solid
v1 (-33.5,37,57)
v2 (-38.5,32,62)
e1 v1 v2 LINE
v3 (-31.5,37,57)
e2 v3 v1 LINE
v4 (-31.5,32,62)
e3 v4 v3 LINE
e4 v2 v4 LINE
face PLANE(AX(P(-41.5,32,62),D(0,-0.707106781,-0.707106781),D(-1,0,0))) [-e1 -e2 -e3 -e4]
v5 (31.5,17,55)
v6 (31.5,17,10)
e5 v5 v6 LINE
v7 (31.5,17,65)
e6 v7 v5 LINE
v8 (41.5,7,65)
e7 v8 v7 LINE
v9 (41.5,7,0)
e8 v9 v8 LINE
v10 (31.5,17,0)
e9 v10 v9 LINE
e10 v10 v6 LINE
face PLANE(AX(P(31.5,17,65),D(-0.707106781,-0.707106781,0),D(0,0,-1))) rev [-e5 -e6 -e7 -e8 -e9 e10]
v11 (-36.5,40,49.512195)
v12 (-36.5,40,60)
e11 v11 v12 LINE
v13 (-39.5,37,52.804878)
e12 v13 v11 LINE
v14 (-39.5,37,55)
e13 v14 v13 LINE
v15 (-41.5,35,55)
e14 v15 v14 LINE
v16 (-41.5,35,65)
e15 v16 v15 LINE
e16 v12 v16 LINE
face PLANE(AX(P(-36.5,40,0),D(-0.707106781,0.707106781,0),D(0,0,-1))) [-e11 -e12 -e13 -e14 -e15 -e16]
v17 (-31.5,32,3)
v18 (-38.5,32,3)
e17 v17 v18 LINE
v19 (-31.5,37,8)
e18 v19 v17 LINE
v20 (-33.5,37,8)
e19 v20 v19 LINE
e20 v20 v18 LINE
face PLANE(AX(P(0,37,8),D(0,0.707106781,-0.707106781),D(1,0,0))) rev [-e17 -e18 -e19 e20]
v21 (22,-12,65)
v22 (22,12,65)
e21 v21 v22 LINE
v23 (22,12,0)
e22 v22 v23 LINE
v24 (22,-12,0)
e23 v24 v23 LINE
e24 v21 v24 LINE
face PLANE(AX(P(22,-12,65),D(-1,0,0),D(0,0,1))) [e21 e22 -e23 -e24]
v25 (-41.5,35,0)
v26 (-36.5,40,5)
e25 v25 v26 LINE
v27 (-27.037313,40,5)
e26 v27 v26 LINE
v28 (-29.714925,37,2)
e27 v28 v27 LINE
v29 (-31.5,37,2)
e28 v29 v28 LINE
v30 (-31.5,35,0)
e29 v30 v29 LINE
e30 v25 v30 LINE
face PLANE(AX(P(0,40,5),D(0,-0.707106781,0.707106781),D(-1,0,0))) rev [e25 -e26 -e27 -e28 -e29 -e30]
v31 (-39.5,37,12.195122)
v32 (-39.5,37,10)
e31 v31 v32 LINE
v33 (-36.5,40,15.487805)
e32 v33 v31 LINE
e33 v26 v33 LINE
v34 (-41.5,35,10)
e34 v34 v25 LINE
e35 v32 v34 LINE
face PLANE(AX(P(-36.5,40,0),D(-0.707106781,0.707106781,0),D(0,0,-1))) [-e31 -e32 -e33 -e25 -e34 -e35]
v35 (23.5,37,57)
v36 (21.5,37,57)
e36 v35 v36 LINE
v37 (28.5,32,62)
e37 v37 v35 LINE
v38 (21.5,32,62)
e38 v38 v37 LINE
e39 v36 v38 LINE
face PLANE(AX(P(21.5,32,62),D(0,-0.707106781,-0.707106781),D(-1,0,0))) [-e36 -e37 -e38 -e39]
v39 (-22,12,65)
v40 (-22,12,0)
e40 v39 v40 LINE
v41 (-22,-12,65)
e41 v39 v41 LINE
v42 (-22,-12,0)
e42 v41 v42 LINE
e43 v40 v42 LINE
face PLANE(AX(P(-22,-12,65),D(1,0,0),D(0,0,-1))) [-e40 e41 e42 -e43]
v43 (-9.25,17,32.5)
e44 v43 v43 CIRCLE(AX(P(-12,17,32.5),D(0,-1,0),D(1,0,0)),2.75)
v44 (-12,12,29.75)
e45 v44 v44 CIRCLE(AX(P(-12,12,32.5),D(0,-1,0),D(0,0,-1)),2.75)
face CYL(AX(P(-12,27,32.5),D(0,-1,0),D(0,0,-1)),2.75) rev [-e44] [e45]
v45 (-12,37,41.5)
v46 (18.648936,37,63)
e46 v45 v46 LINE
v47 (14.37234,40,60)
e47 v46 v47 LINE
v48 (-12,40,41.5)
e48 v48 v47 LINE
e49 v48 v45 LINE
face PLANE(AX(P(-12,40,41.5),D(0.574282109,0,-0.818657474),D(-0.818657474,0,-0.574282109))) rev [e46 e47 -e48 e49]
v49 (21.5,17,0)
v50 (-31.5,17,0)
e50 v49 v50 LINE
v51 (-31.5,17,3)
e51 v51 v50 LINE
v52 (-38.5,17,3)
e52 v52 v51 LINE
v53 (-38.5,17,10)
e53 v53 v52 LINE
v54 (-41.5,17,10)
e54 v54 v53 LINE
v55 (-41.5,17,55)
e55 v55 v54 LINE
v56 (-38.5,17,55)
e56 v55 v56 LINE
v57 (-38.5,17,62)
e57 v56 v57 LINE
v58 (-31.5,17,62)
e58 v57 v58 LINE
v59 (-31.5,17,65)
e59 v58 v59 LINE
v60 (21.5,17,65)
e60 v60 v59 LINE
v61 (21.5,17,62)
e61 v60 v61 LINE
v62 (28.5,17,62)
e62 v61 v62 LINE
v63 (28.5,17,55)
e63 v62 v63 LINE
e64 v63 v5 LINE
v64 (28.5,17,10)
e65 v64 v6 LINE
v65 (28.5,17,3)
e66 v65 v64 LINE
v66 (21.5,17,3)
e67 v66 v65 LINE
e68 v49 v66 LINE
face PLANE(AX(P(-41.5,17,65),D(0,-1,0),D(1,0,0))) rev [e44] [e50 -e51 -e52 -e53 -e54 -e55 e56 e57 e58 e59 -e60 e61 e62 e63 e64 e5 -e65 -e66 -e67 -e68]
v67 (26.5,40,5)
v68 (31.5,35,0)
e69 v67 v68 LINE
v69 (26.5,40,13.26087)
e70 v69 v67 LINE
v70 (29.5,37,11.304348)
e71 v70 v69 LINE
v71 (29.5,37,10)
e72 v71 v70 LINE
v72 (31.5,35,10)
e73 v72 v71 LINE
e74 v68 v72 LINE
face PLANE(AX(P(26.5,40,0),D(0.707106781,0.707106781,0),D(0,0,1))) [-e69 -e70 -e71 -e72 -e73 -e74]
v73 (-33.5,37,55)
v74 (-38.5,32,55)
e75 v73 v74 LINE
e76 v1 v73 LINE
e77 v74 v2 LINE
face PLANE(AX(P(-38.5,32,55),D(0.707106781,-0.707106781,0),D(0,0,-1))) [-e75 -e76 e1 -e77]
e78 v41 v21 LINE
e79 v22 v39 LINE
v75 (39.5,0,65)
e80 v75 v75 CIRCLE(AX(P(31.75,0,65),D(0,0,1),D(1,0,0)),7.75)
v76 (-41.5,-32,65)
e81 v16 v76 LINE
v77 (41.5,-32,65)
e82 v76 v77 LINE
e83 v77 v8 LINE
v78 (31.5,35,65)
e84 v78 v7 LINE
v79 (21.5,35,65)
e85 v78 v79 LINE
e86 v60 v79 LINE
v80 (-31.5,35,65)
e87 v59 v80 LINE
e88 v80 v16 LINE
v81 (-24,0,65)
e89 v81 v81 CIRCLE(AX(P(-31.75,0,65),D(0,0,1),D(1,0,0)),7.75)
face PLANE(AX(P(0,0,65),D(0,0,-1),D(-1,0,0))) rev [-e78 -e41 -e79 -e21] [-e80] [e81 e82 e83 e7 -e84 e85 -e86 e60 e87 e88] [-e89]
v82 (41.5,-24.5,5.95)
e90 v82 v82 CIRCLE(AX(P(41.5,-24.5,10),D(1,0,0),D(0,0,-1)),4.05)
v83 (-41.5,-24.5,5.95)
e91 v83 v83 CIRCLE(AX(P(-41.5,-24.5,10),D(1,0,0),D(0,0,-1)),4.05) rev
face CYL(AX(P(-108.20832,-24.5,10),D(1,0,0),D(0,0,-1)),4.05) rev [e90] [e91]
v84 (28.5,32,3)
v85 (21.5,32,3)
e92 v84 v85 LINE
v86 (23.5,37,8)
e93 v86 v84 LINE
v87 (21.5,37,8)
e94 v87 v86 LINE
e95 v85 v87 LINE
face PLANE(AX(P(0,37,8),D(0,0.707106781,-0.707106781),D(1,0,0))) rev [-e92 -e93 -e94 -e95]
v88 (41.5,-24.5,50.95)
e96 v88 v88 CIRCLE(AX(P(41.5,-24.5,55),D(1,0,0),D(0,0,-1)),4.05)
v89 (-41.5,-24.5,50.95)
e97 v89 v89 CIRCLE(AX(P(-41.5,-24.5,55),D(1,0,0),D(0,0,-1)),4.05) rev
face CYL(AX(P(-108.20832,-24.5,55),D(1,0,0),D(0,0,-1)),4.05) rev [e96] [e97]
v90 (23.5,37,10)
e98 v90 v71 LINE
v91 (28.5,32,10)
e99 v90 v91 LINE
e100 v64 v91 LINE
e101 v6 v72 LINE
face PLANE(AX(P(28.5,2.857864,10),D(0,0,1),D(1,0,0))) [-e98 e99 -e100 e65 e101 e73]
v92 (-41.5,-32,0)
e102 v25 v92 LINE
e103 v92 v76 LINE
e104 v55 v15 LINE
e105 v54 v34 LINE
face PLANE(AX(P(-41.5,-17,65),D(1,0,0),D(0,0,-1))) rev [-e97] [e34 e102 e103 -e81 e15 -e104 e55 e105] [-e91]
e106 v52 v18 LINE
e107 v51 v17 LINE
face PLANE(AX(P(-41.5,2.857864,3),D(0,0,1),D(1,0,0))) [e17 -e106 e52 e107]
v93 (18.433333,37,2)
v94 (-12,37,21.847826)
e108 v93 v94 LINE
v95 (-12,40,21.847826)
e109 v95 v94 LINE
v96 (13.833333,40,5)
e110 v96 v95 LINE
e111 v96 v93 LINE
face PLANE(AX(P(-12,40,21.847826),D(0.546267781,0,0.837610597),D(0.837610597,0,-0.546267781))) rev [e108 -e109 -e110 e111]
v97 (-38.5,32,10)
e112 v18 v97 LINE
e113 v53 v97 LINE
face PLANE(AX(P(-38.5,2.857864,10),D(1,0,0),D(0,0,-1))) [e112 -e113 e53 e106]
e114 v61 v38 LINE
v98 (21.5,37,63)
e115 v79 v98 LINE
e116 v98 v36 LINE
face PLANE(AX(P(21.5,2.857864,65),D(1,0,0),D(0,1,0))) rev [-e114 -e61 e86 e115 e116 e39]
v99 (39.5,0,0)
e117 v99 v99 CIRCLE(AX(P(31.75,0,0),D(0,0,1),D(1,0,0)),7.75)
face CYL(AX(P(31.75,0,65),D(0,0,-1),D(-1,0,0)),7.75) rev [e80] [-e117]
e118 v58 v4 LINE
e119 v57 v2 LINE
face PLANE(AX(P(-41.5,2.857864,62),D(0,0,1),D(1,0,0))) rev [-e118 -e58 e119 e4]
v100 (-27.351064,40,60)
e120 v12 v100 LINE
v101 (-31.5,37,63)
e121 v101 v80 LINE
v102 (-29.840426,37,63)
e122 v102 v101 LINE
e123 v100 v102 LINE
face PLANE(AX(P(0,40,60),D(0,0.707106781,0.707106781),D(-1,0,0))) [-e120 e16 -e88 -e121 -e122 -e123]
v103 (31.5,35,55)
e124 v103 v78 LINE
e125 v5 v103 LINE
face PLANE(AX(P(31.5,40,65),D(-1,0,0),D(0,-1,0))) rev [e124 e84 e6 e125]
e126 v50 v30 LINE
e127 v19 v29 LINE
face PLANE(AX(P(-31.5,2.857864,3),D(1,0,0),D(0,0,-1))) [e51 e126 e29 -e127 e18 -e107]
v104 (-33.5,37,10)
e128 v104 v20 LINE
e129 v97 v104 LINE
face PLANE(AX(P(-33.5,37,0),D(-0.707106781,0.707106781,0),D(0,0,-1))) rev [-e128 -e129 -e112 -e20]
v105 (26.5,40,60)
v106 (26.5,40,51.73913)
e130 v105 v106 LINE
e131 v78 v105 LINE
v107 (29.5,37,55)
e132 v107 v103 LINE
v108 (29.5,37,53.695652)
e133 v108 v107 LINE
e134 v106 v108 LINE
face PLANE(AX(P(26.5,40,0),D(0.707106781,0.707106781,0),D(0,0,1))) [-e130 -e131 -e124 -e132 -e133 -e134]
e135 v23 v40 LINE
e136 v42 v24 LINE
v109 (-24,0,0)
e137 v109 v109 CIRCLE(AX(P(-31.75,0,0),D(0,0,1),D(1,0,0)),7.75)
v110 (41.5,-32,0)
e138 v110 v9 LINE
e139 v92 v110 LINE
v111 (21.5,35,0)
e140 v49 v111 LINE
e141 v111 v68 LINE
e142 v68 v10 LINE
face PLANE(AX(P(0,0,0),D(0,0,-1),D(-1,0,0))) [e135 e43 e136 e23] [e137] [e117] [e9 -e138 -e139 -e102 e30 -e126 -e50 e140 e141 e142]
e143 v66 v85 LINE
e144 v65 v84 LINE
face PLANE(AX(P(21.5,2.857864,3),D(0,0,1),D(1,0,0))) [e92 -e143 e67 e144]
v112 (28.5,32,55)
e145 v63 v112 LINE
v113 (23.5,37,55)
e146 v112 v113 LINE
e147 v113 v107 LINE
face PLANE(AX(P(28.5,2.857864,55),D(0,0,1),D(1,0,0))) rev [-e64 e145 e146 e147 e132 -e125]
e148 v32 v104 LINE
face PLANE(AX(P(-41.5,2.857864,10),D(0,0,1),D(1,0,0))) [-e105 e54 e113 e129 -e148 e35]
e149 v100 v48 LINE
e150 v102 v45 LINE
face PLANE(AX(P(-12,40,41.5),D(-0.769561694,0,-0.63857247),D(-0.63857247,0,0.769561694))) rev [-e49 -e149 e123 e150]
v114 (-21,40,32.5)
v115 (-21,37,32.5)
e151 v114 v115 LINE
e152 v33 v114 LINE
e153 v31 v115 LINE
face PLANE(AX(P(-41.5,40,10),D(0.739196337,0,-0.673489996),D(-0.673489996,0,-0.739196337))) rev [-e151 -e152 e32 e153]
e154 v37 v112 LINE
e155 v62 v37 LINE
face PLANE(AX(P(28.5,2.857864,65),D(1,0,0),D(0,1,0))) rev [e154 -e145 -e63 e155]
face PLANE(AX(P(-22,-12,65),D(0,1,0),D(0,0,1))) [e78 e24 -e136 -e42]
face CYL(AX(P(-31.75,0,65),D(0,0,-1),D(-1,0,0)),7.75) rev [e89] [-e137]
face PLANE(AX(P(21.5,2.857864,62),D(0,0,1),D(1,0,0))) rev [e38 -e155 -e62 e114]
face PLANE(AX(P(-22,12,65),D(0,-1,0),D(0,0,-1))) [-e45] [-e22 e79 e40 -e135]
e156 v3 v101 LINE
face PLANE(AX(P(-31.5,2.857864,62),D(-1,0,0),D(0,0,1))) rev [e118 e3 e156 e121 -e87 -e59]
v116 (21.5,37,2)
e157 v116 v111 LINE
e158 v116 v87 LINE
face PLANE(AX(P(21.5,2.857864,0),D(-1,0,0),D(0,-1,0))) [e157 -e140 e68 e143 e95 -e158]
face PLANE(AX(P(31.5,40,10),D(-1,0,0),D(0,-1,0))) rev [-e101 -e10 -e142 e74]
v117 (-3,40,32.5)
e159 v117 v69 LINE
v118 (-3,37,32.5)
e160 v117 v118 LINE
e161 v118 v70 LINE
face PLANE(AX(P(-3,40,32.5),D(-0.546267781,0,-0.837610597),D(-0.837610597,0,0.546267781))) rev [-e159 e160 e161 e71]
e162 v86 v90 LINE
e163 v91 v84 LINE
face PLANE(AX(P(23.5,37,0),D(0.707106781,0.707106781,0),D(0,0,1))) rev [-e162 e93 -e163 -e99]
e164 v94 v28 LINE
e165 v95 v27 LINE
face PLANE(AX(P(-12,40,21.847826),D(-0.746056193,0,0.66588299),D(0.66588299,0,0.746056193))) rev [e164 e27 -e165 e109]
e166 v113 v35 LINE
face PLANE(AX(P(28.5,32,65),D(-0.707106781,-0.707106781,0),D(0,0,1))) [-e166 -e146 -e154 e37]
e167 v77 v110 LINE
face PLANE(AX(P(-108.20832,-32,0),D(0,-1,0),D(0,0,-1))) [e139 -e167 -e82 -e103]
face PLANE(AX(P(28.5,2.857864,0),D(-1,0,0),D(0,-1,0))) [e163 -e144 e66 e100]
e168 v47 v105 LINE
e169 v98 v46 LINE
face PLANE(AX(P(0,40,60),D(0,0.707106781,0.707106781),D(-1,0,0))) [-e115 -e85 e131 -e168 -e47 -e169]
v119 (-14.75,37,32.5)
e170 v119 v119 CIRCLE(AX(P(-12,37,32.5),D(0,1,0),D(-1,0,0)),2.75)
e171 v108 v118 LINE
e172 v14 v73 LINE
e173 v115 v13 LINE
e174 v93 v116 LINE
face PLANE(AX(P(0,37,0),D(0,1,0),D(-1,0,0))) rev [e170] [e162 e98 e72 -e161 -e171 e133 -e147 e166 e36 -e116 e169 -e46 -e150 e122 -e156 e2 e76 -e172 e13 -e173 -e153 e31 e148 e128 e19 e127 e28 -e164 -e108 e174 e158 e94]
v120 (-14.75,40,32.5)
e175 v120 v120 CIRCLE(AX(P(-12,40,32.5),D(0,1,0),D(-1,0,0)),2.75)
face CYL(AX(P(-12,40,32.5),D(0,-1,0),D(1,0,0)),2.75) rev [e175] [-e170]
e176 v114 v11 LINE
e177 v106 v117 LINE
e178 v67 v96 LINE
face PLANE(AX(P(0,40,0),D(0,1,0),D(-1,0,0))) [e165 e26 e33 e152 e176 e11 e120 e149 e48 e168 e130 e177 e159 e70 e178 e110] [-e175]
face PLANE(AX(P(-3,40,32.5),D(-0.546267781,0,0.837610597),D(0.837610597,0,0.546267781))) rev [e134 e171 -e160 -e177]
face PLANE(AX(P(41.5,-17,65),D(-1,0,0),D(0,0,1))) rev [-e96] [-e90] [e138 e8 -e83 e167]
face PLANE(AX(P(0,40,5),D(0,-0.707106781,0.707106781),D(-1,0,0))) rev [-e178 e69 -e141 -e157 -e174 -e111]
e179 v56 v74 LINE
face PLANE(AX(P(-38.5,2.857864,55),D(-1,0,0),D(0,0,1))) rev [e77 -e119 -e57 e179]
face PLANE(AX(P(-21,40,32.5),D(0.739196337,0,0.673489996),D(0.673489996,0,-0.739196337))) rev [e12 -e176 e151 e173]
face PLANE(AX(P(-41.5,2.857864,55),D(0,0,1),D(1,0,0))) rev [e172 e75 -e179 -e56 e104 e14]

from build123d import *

# Parameters (mm, degrees)
SKETCH1_R           = 7.75
SKETCH1_W           = 44
SKETCH1_H           = 24
BOSS_EXTRUDE1_DEPTH = 65
SKETCH5_W           = 65
SKETCH5_H           = 15
SKETCH5_R           = 4.05
BOSS_EXTRUDE4_DEPTH = 83
CHAMFER1_SIZE       = 10
SKETCH6_R           = 2.75
CUT_EXTRUDE1_DEPTH  = 15
SKETCH8_R           = 2.75
BOSS_EXTRUDE5_DEPTH = 3
EXTRUDE_THIN2_DEPTH = 20
CHAMFER2_SIZE       = 5
CHAMFER3_SIZE       = 5


with BuildPart() as part:
    # Sketch1 → Boss-Extrude1 (new body)
    with BuildSketch(Plane.XY):
        Polygon((31.75, 17), (-31.75, 17), (-41.5, 17), (-41.5, -17), (-31.75, -17), (31.75, -17), (41.5, -17), (41.5, 17), align=None)
        with Locations((-31.75, 0)):
            Circle(SKETCH1_R, mode=Mode.SUBTRACT)
        with Locations((31.75, 0)):
            Circle(SKETCH1_R, mode=Mode.SUBTRACT)
        Rectangle(SKETCH1_W, SKETCH1_H, mode=Mode.SUBTRACT)
    extrude(amount=BOSS_EXTRUDE1_DEPTH)

    # Sketch5 → Boss-Extrude4 (add)
    with BuildSketch(Plane(origin=(41.5, 0, 0), x_dir=(0, 0, -1), z_dir=(1, 0, 0))):
        with Locations((-32.5, -24.5)):
            Rectangle(SKETCH5_W, SKETCH5_H)
        with Locations((-55, -24.5)):
            Circle(SKETCH5_R, mode=Mode.SUBTRACT)
        with Locations((-10, -24.5)):
            Circle(SKETCH5_R, mode=Mode.SUBTRACT)
    extrude(amount=-BOSS_EXTRUDE4_DEPTH)

    # Chamfer1
    chamfer1_edges = [part.edges().sort_by_distance(p)[0] for p in [
        (41.5, 17, 32.5),
    ]]
    chamfer(chamfer1_edges, length=CHAMFER1_SIZE)

    # Sketch6 → Cut-Extrude1 (cut)
    with BuildSketch(Plane(origin=(0, 12, 0), x_dir=(-1, 0, 0), z_dir=(0, -1, 0))):
        with Locations(Location((12, -32.5, 0), (0, 0, 90))):
            Circle(SKETCH6_R)
    extrude(amount=-CUT_EXTRUDE1_DEPTH, mode=Mode.SUBTRACT)



with BuildPart() as body_2:
    # Sketch8 → Boss-Extrude5 (new body)
    with BuildSketch(Plane(origin=(0, 37, 0), x_dir=(1, 0, 0), z_dir=(0, 1, 0))):
        Polygon((-41.5, -10), (-21, -32.5), (-41.5, -55), (-41.5, -65), (-31.5, -65), (-12, -41.5), (21.5, -65), (31.5, -65), (31.5, -55), (-3, -32.5), (31.5, -10), (31.5, 0), (21.5, 0), (-12, -21.847826087), (-31.5, 0), (-41.5, 0), align=None)
        with Locations(Location((-12, -32.5, 0), (0, 0, 90))):
            Circle(SKETCH8_R, mode=Mode.SUBTRACT)
    extrude(amount=BOSS_EXTRUDE5_DEPTH)


with BuildPart() as part_1:
    add(part.part)

    add(body_2.part)  # Extrude-Thin2 merges body 2
    # Sketch9 → Extrude-Thin2 (add)
    with BuildSketch(Plane(origin=(0, 37, 0), x_dir=(-1, 0, 0), z_dir=(0, -1, 0))):
        Polygon((41.5, -10), (41.5, 0), (31.5, 0), (31.5, -3), (38.5, -3), (38.5, -10), align=None)
        Polygon((-21.5, 0), (-31.5, 0), (-31.5, -10), (-28.5, -10), (-28.5, -3), (-21.5, -3), align=None)
    extrude_thin2 = extrude(amount=EXTRUDE_THIN2_DEPTH)

    # Mirror1: Extrude-Thin2 across plane
    add(extrude_thin2.mirror(Plane.XY.offset(32.5)))

    # Chamfer2
    chamfer2_edges = [part_1.edges().sort_by_distance(p)[0] for p in [
        (25, 37, 3),
        (28.5, 37, 6.5),
        (-38.5, 37, 58.5),
        (-35, 37, 62),
        (25, 37, 62),
        (28.5, 37, 58.5),
        (-38.5, 37, 6.5),
        (-35, 37, 3),
    ]]
    chamfer(chamfer2_edges, length=CHAMFER2_SIZE)

    # Chamfer3
    # the kernel refuses this chamfer: 5 mm, written as the material it takes off along each edge
    with BuildSketch(Plane(origin=(-41.5, 40, 42.14158506), x_dir=(0.9996219169112968, 0.0274958766105877, 0), z_dir=(0, 0, 1)), Plane(origin=(-54.35841494, 40, 65), x_dir=(0, 0.027495876610586317, -0.9996219169112968), z_dir=(1, 0, 0)), Plane(origin=(8.64158506, 40, 65), x_dir=(0, 0.027495876610586317, -0.9996219169112968), z_dir=(1, 0, 0)), Plane(origin=(31.5, 40, 77.85841494), x_dir=(-0.9996219169112968, 0.027495876610584936, 0), z_dir=(0, 0, -1)), Plane(origin=(44.35841494, 40, 0), x_dir=(0, 0.027495876610586317, 0.9996219169112968), z_dir=(-1, 0, 0)), Plane(origin=(-18.64158506, 40, 0), x_dir=(-1.1764219776297879e-15, 0.027495876610586317, 0.9996219169112968), z_dir=(-1, 0, 0)), Plane(origin=(-41.5, 40, -12.85841494), x_dir=(0.9996219169112968, 0.0274958766105877, 1.4205481831358163e-15), z_dir=(0, 0, 1))) as chamfer3_piece_1:
        Polygon((CHAMFER3_SIZE * 0.999621916911, -CHAMFER3_SIZE * 0.0274958766106), (-CHAMFER3_SIZE * 0.0274958766106, -CHAMFER3_SIZE * 0.999621916911), (0, 0), align=None)
    extrude(amount=35.71682988, mode=Mode.SUBTRACT)
    with BuildSketch(Plane(origin=(31.5, 40, 22.85841494), x_dir=(0.02749587661058701, -0.9996219169112968, 0), z_dir=(0, 0, -1))) as chamfer3_piece_2:
        Polygon((CHAMFER3_SIZE * 0.999621916911, CHAMFER3_SIZE * 0.0274958766106), (-CHAMFER3_SIZE * 0.0274958766106, CHAMFER3_SIZE * 0.999621916911), (0, 0), align=None)
    extrude(amount=35.71682988, mode=Mode.SUBTRACT)


solid = part_1.part
